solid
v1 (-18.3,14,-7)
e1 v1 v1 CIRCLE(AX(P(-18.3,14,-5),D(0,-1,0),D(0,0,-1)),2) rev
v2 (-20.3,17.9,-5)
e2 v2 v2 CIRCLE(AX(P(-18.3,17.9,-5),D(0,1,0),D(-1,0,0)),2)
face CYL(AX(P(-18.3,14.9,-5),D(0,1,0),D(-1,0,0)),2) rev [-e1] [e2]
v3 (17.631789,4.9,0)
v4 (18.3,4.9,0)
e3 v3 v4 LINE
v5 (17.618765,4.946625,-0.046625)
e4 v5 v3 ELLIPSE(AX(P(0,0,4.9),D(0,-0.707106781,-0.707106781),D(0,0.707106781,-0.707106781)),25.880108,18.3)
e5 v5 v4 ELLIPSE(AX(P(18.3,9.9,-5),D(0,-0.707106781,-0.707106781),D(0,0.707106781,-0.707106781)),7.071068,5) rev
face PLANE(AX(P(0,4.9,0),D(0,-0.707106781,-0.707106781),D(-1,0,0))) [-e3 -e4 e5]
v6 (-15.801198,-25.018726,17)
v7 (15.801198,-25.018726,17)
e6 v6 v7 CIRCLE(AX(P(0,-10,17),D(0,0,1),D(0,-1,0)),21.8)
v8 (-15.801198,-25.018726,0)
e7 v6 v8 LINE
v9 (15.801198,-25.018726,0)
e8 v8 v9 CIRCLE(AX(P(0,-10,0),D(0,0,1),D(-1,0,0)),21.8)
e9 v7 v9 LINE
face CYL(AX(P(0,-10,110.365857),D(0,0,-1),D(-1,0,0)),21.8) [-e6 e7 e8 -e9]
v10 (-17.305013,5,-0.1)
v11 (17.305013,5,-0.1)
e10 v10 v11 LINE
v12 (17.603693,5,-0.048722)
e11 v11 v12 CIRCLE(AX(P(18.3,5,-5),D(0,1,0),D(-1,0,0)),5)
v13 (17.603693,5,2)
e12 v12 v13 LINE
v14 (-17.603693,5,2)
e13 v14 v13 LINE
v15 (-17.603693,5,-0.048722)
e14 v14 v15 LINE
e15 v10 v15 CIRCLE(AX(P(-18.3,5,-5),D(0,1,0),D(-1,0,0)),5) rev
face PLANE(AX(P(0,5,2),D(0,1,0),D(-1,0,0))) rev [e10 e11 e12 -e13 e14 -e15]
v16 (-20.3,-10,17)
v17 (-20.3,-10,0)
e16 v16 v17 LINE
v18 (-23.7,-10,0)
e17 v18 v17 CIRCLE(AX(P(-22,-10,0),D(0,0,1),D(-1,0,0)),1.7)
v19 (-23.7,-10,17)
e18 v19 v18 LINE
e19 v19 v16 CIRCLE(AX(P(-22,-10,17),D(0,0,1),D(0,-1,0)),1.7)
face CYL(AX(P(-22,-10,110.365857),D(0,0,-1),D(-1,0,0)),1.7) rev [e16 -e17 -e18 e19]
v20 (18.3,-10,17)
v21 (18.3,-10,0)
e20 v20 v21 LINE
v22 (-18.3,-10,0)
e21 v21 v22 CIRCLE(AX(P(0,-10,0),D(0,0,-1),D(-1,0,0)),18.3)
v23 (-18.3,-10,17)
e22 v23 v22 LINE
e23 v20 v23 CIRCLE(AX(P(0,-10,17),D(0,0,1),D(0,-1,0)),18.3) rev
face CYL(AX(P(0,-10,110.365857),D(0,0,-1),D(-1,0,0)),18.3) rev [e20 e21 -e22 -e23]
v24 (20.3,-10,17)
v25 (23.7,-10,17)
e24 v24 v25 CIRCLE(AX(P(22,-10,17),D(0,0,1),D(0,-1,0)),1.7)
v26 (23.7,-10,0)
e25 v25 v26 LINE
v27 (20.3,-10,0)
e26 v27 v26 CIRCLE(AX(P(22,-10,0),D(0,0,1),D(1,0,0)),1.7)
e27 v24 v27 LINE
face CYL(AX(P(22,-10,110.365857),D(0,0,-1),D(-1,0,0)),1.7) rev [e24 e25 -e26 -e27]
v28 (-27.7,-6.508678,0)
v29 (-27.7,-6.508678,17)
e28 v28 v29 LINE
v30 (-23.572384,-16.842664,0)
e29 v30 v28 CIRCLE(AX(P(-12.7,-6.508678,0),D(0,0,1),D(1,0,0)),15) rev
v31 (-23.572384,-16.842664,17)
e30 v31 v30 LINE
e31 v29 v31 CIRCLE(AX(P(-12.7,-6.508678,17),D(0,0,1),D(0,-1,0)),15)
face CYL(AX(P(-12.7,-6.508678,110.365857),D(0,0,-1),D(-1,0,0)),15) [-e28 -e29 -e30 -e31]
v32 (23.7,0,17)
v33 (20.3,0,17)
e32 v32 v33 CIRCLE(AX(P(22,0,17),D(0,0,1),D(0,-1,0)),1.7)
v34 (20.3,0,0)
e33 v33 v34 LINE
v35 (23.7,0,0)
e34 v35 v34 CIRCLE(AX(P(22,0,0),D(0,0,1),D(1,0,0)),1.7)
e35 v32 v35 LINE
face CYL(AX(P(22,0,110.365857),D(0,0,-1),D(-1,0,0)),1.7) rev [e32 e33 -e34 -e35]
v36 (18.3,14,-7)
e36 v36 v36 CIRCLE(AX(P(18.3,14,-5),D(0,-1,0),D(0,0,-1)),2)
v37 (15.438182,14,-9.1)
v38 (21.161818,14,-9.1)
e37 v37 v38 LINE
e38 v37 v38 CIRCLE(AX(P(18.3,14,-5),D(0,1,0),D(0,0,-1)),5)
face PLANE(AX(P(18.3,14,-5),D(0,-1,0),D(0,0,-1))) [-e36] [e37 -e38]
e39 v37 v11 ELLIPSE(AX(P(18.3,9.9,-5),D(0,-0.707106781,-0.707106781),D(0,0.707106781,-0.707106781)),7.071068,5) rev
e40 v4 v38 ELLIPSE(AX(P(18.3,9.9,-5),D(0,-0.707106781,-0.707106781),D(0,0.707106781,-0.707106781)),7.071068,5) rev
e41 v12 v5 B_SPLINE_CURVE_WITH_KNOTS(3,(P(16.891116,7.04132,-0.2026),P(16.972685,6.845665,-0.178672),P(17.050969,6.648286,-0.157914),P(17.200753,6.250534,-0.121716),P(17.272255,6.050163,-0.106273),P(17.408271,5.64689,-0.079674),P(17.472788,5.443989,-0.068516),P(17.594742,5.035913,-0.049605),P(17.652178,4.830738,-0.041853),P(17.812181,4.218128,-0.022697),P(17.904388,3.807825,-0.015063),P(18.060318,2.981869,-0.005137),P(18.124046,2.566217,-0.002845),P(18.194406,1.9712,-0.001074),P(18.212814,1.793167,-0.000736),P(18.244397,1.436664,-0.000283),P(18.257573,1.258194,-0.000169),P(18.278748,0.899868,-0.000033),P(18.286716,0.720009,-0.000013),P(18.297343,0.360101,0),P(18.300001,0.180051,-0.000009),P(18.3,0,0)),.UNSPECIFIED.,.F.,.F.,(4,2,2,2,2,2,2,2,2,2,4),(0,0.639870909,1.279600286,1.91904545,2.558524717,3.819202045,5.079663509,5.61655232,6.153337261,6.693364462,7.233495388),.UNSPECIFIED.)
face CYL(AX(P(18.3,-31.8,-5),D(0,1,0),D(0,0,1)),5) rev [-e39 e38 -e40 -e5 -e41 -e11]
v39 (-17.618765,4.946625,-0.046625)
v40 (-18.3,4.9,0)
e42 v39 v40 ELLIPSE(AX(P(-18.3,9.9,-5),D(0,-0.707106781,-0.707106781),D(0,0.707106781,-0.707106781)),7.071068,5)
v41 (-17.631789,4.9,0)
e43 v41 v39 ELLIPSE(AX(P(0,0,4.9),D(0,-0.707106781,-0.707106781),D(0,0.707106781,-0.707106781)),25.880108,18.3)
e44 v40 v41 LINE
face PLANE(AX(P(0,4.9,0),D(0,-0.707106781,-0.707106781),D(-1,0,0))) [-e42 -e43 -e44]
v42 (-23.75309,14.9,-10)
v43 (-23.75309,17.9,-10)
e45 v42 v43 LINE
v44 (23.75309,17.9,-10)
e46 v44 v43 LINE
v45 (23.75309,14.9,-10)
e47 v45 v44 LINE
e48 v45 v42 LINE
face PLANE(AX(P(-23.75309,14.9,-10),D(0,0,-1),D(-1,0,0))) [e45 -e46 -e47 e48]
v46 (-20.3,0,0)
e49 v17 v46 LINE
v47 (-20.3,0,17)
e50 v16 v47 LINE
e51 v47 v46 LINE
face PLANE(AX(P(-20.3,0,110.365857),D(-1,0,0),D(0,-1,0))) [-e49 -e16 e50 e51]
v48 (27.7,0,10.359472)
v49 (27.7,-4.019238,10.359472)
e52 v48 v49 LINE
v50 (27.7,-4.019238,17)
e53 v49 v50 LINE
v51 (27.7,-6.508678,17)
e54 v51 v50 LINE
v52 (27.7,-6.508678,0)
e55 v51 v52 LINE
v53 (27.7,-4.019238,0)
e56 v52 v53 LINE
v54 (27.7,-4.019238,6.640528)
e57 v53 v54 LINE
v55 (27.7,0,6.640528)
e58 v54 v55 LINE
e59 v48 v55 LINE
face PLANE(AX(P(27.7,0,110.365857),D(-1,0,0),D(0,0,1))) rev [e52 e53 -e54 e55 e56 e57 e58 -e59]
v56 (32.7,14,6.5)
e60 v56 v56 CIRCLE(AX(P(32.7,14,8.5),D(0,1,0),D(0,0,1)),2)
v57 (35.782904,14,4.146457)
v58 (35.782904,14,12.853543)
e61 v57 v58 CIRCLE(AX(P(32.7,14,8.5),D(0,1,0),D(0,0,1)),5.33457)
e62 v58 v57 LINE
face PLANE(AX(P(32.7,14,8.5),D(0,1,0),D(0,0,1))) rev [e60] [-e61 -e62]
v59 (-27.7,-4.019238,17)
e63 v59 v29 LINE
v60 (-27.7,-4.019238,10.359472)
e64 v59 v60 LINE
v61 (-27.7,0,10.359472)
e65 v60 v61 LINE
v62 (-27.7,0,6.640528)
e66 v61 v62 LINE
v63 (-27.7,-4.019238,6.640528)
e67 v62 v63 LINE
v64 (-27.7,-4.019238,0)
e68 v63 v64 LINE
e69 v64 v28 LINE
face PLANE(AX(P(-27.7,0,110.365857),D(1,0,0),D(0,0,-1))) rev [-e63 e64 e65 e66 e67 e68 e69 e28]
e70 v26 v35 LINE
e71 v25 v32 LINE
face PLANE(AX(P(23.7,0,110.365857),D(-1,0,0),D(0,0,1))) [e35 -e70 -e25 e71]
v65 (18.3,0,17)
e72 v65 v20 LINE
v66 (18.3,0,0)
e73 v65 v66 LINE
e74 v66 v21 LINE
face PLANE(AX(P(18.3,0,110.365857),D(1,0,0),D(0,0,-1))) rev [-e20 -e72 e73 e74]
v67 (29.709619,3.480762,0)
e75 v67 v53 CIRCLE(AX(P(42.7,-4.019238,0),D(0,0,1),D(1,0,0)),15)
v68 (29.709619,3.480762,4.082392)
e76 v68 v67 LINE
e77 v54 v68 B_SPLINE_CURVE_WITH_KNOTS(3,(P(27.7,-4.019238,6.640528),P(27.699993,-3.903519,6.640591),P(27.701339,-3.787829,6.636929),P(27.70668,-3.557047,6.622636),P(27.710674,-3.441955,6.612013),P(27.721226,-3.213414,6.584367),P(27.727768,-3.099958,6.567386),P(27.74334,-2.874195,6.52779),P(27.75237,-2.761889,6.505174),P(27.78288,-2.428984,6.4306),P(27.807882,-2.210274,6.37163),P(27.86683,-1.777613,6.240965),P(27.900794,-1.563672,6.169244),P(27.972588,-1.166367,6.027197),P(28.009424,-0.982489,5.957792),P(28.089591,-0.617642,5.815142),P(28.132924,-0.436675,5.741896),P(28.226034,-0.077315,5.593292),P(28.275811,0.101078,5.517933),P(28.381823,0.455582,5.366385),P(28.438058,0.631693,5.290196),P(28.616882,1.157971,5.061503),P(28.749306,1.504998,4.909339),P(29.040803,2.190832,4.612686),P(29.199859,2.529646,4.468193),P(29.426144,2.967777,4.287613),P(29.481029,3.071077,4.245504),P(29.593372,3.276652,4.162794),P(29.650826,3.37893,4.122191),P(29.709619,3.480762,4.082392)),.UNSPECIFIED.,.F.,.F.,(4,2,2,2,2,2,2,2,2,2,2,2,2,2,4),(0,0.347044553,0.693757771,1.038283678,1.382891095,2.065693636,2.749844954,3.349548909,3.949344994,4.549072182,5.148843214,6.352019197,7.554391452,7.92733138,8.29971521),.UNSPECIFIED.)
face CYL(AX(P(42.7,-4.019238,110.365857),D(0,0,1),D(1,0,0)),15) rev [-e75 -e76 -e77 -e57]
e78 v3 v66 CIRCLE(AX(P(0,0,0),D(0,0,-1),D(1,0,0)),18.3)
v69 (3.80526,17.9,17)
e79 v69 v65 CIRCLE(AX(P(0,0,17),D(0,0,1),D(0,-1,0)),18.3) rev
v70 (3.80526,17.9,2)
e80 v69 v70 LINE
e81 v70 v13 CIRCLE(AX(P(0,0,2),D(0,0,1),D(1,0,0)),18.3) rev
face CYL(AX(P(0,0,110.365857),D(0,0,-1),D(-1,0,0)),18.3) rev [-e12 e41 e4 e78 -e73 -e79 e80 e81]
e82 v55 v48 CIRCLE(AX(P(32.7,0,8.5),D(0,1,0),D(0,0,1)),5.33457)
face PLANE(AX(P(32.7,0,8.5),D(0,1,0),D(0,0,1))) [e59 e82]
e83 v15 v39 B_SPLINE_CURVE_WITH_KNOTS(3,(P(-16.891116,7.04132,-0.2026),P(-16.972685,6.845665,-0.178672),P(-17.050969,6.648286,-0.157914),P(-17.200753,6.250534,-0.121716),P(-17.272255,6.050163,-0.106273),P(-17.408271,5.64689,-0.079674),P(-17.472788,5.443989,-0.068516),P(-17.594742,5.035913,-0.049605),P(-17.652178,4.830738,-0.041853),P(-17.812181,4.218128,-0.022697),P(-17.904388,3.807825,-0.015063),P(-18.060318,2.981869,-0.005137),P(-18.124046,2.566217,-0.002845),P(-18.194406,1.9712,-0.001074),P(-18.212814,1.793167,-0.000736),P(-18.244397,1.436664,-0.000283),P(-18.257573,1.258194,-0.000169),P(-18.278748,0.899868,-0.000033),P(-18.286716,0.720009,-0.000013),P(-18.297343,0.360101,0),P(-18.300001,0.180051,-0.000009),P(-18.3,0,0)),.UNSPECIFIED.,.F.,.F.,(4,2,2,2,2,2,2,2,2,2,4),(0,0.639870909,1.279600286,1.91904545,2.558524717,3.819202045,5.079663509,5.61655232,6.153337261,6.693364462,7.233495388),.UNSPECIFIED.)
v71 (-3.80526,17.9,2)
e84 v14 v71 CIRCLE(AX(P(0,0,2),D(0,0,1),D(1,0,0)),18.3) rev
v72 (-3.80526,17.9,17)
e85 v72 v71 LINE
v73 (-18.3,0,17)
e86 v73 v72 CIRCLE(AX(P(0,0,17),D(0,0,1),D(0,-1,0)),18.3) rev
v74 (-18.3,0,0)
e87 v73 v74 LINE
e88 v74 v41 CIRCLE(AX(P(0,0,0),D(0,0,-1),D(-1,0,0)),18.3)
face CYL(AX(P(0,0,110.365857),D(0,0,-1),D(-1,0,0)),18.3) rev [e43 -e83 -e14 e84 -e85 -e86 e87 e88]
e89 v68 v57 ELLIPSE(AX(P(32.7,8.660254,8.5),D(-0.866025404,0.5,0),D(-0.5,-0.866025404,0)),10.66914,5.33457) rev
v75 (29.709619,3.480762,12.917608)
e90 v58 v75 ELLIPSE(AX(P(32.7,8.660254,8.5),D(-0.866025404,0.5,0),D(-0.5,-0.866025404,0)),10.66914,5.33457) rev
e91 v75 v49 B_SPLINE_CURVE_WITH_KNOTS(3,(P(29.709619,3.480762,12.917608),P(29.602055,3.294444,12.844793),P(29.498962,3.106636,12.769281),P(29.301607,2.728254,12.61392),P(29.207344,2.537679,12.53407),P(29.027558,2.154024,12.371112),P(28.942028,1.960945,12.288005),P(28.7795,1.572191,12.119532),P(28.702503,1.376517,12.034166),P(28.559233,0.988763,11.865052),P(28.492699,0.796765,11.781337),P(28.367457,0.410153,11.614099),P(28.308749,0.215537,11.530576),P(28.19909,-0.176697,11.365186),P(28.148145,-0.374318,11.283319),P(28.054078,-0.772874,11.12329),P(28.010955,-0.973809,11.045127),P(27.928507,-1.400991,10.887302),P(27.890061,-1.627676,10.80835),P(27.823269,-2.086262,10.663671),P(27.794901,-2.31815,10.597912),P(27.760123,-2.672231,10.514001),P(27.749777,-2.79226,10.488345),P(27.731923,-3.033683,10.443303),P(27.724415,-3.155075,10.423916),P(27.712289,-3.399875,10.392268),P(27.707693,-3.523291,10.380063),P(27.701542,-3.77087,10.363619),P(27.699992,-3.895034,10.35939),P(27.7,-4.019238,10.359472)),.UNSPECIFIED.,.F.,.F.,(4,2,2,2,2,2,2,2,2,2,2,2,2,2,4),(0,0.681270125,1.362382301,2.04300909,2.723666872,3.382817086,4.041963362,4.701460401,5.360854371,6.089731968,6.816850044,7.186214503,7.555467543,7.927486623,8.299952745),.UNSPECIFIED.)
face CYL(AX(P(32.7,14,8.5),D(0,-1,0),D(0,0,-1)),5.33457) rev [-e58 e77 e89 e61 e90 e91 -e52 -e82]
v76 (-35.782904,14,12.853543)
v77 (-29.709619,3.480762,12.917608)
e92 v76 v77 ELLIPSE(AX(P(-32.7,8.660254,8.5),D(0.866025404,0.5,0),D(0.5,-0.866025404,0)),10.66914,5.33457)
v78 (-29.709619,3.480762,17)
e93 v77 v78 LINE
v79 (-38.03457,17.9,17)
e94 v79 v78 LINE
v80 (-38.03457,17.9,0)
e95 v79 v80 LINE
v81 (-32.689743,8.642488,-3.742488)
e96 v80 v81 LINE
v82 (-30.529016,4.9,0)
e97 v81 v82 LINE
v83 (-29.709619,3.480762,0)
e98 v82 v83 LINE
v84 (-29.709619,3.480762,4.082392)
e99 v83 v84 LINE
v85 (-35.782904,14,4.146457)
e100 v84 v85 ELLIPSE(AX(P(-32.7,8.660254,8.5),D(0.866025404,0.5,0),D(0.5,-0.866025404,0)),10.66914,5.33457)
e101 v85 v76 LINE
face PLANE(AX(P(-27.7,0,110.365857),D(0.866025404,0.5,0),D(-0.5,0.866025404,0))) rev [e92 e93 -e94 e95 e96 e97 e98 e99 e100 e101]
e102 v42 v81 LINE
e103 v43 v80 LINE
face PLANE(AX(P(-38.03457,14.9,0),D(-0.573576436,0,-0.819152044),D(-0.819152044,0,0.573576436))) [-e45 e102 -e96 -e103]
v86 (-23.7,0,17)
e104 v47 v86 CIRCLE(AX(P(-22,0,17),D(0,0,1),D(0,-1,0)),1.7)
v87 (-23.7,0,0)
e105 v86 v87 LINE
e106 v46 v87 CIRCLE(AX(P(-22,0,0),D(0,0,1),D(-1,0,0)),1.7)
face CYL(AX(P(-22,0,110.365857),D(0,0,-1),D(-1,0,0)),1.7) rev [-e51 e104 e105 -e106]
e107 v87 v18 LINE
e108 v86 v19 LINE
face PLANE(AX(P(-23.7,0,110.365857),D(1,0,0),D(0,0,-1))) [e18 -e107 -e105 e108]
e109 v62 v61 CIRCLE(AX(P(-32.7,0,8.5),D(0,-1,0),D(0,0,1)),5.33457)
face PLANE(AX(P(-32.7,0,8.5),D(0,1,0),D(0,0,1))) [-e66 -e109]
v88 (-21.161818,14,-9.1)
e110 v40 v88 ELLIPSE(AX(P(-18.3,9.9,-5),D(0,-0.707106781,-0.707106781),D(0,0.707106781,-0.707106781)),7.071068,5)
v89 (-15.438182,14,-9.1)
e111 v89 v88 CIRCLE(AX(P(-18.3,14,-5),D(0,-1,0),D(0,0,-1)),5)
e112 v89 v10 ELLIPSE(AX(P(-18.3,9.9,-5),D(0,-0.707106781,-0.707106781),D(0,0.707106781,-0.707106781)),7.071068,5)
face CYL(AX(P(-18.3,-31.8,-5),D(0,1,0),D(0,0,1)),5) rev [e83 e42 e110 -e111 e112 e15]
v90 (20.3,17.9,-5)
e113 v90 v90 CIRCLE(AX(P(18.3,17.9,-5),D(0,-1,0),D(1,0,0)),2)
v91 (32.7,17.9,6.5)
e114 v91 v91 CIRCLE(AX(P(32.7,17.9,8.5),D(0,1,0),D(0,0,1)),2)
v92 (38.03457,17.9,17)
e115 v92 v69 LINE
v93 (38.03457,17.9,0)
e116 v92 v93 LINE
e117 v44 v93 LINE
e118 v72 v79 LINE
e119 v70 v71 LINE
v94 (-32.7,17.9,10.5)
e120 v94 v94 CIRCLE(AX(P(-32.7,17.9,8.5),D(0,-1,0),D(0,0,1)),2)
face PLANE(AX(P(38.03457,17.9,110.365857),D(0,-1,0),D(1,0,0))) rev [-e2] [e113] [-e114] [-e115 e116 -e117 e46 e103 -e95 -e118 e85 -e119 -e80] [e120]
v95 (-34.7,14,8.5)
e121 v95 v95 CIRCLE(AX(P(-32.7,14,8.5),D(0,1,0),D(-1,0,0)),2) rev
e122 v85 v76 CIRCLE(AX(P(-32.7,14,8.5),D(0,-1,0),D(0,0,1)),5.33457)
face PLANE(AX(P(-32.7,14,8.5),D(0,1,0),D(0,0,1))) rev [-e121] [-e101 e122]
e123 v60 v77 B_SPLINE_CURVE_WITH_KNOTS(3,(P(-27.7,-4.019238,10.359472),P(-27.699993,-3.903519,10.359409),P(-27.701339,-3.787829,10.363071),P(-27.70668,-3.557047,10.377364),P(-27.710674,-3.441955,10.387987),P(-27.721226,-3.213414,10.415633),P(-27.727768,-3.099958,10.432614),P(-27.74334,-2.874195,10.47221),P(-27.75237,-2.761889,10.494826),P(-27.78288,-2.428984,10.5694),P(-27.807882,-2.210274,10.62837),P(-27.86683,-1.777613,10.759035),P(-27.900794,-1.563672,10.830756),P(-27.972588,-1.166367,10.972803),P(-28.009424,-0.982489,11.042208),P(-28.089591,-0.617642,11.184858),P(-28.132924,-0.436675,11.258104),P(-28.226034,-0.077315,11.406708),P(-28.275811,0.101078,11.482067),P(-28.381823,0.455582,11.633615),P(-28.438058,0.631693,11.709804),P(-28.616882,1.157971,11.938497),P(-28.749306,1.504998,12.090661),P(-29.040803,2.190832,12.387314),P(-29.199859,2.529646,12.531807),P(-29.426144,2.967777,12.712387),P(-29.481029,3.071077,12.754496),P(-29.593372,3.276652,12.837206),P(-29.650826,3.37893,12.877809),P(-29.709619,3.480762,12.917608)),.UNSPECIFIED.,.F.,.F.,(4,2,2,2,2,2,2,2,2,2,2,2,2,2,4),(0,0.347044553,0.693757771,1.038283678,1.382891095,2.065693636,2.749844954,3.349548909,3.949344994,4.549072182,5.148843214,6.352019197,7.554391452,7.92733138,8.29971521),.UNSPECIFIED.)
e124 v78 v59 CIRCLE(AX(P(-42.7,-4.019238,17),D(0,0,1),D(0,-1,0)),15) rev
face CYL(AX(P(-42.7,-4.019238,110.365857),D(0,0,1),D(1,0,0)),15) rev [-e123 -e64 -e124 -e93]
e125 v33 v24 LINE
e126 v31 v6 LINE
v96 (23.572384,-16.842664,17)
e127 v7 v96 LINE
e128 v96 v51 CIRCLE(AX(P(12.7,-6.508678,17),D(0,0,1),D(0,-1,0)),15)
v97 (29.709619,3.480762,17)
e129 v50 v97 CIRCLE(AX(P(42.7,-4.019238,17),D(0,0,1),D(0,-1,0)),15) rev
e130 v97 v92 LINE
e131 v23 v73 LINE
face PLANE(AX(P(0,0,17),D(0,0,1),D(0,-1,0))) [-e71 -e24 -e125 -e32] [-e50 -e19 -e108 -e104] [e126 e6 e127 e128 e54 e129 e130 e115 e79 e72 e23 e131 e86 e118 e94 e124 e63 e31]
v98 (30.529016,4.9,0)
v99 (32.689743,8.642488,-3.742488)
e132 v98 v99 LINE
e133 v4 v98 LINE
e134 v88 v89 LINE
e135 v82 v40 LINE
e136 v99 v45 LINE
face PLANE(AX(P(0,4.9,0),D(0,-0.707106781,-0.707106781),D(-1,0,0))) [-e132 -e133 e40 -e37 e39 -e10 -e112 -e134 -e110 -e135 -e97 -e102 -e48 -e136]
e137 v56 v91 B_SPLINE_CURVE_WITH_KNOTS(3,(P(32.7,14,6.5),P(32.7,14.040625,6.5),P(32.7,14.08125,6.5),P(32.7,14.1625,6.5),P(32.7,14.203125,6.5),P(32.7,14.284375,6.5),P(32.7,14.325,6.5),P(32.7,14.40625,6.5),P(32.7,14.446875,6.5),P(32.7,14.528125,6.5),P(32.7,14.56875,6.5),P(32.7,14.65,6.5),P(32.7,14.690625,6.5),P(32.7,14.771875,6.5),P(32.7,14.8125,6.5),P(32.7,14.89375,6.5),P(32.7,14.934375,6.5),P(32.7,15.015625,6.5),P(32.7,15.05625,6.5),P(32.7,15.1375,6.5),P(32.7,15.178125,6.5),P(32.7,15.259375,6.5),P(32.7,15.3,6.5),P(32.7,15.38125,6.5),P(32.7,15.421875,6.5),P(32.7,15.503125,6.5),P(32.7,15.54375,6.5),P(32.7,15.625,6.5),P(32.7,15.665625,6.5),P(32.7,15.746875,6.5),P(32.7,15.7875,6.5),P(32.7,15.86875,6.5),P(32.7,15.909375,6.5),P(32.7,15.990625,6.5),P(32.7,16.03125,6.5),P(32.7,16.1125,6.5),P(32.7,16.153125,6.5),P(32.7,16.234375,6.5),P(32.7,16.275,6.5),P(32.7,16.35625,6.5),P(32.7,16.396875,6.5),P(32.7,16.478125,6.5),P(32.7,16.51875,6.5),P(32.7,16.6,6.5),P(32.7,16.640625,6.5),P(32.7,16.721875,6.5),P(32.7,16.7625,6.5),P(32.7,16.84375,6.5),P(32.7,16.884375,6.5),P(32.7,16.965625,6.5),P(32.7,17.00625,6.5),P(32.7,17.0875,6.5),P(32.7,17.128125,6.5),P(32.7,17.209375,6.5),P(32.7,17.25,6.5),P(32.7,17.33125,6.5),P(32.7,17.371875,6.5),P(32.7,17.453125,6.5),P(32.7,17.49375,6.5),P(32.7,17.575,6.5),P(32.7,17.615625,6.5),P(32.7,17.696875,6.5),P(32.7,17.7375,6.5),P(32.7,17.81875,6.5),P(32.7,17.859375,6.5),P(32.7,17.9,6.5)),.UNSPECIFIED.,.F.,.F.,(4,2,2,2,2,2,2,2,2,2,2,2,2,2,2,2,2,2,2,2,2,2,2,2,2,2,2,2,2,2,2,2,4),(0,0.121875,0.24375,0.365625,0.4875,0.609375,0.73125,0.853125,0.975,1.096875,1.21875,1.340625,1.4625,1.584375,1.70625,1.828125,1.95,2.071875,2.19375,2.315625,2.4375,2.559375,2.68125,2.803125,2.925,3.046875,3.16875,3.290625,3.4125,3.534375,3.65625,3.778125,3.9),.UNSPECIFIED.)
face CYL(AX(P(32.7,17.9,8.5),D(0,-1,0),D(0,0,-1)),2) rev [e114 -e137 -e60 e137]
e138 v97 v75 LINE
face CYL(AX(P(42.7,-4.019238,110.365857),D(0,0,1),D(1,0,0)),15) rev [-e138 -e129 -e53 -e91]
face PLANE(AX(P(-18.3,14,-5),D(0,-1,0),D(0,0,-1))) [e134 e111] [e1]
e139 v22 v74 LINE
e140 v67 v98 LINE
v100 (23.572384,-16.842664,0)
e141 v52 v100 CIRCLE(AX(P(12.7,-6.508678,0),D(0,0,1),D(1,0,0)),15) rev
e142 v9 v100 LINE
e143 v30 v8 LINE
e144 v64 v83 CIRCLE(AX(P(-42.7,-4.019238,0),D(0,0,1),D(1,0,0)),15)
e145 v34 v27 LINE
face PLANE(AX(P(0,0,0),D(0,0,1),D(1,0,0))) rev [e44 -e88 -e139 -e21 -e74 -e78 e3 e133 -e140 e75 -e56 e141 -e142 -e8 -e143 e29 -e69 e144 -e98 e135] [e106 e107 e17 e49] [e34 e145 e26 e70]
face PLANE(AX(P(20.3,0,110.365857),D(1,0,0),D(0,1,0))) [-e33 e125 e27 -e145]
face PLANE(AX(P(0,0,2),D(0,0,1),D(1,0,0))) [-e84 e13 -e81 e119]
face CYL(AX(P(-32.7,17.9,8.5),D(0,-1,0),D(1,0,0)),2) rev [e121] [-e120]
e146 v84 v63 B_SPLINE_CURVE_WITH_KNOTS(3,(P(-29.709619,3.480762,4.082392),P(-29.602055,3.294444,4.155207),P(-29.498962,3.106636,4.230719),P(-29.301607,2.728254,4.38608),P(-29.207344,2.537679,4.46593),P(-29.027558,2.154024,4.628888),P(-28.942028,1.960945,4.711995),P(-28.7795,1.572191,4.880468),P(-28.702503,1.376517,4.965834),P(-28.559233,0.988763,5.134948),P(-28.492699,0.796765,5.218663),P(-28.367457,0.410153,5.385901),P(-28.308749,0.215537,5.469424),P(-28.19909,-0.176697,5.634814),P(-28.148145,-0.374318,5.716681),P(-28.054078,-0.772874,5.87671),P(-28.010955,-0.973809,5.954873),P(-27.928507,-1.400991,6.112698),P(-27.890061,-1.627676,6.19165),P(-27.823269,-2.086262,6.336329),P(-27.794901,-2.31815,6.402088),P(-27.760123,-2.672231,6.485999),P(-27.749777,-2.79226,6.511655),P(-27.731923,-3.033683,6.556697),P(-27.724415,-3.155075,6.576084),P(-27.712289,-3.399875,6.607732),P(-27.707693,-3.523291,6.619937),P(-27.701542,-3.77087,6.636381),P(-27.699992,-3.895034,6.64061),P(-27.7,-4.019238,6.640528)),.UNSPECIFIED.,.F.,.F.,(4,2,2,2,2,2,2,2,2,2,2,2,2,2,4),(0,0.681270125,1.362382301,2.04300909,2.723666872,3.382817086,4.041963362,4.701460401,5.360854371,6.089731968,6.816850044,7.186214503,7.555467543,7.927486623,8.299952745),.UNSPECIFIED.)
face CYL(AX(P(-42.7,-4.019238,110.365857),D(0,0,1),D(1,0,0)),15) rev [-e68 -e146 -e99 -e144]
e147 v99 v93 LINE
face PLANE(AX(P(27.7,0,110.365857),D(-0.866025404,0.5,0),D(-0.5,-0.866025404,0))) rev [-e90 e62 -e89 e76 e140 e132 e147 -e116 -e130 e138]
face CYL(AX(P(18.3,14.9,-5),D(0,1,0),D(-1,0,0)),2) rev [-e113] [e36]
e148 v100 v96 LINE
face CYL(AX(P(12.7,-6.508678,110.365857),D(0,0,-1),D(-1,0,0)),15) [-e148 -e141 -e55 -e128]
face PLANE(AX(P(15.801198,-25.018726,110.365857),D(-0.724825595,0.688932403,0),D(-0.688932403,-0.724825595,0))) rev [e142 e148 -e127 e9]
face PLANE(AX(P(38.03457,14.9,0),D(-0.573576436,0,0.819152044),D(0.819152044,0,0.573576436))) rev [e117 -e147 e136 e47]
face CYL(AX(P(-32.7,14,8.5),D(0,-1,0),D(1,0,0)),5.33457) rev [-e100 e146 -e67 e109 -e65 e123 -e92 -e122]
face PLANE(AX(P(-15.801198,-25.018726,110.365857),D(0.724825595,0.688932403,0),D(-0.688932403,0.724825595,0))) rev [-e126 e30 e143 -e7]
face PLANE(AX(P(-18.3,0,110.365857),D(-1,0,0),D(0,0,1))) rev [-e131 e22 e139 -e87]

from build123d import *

# Parameters (mm, degrees)
BOSS_EXTRUDE1_DEPTH = 17
BOSS_EXTRUDE2_START = -17
BOSS_EXTRUDE2_DEPTH = 2
SKETCH3_R           = 2
CUT_EXTRUDE2_DEPTH  = 53.410576235
SKETCH4_R           = 5.334569818
CUT_EXTRUDE3_DEPTH  = 14
SKETCH5_R           = 2
BOSS_EXTRUDE3_DEPTH = 3
CUT_EXTRUDE4_DEPTH  = 57.452356029
CHAMFER2_SIZE       = 10
FILLET1_R           = 15
FILLET2_R           = 15
SKETCH7_R           = 5
CUT_EXTRUDE6_DEPTH  = 62.913395196


with BuildPart() as part:
    # Sketch1 → Boss-Extrude1 (new body)
    with BuildSketch(Plane.XY):
        with BuildLine():
            Line((38.034569818, 17.9), (3.805259518, 17.9))
            ThreePointArc((3.805259518, 17.9), (14.221924082, 11.51637423), (18.3, 0))
            Line((18.3, 0), (18.3, -10))
            ThreePointArc((18.3, -10), (0, -28.3), (-18.3, -10))
            Line((-18.3, -10), (-18.3, 0))
            ThreePointArc((-18.3, 0), (-14.221924082, 11.51637423), (-3.805259518, 17.9))
            Line((-3.805259518, 17.9), (-38.034569818, 17.9))
            Line((-38.034569818, 17.9), (-27.7, 0))
            Line((-27.7, 0), (-27.7, -12.5))
            Line((-27.7, -12.5), (-15.801197979, -25.018726392))
            ThreePointArc((-15.801197979, -25.018726392), (0, -31.8), (15.801197979, -25.018726392))
            Line((15.801197979, -25.018726392), (27.7, -12.5))
            Line((27.7, -12.5), (27.7, 0))
            Line((27.7, 0), (38.034569818, 17.9))
        make_face()
        with BuildLine():
            Line((23.7, 0), (23.7, -10))
            ThreePointArc((23.7, -10), (22, -11.7), (20.3, -10))
            Line((20.3, -10), (20.3, 0))
            ThreePointArc((20.3, 0), (22, 1.7), (23.7, 0))
        make_face(mode=Mode.SUBTRACT)
        with BuildLine():
            Line((-23.7, 0), (-23.7, -10))
            ThreePointArc((-23.7, -10), (-22, -11.7), (-20.3, -10))
            Line((-20.3, -10), (-20.3, 0))
            ThreePointArc((-20.3, 0), (-22, 1.7), (-23.7, 0))
        make_face(mode=Mode.SUBTRACT)
    extrude(amount=BOSS_EXTRUDE1_DEPTH)

    # Sketch2 → Boss-Extrude2 (add)
    with BuildSketch(Plane.XY.offset(17).offset(BOSS_EXTRUDE2_START)):
        Polygon((38.034569818, 17.9), (-38.034569818, 17.9), (-30.586751346, 5), (30.586751346, 5), align=None)
    extrude(amount=BOSS_EXTRUDE2_DEPTH)

    # Sketch3 → Cut-Extrude2 (cut, through all)
    with BuildSketch(Plane(origin=(0, 0, 0), x_dir=(1, 0, 0), z_dir=(0, 1, 0))):
        with Locations(Location((32.7, -8.5, 0), (0, 0, 180))):
            Circle(SKETCH3_R)
    cut_extrude2 = extrude(amount=CUT_EXTRUDE2_DEPTH, mode=Mode.SUBTRACT)

    # Sketch4 → Cut-Extrude3 (cut)
    with BuildSketch(Plane(origin=(0, 0, 0), x_dir=(1, 0, 0), z_dir=(0, 1, 0))):
        with Locations((32.7, -8.5)):
            Circle(SKETCH4_R)
    cut_extrude3 = extrude(amount=CUT_EXTRUDE3_DEPTH, mode=Mode.SUBTRACT)

    # Sketch5 → Boss-Extrude3 (add)
    with BuildSketch(Plane(origin=(0, 17.9, 0), x_dir=(1, 0, 0), z_dir=(0, 1, 0))):
        Polygon((-38.034569818, 0), (-23.753089751, 10), (0, 10), (0, 0), align=None)
        with Locations(Location((-18.3, 5, 0), (0, 0, 180))):
            Circle(SKETCH5_R, mode=Mode.SUBTRACT)
    boss_extrude3 = extrude(amount=-BOSS_EXTRUDE3_DEPTH)

    # Sketch6 → Cut-Extrude4 (cut, through all)
    with BuildSketch(Plane(origin=(0, 0, -10), x_dir=(-1, 0, 0), z_dir=(0, 0, -1))):
        Polygon((36.302519011, 14.9), (38.034569818, 17.9), (38.034569818, 14.9), align=None)
    cut_extrude4 = extrude(amount=-CUT_EXTRUDE4_DEPTH, mode=Mode.SUBTRACT)

    # Mirror2: Cut-Extrude2, Cut-Extrude3, Boss-Extrude3 across plane
    add(cut_extrude2.mirror(Plane(origin=(0, 14.9, -10), x_dir=(0, 0, 1), z_dir=(1, 0, 0))), mode=Mode.SUBTRACT)
    add(cut_extrude3.mirror(Plane(origin=(0, 14.9, -10), x_dir=(0, 0, 1), z_dir=(1, 0, 0))), mode=Mode.SUBTRACT)
    add(boss_extrude3.mirror(Plane(origin=(0, 14.9, -10), x_dir=(0, 0, 1), z_dir=(1, 0, 0))))

    # Mirror3: Cut-Extrude2, Cut-Extrude3, Cut-Extrude4 across plane
    add(cut_extrude2.mirror(Plane(origin=(0, 0, 0), x_dir=(0, 0, 1), z_dir=(1, 0, 0))), mode=Mode.SUBTRACT)
    add(cut_extrude3.mirror(Plane(origin=(0, 0, 0), x_dir=(0, 0, 1), z_dir=(1, 0, 0))), mode=Mode.SUBTRACT)
    add(cut_extrude4.mirror(Plane(origin=(0, 0, 0), x_dir=(0, 0, 1), z_dir=(1, 0, 0))), mode=Mode.SUBTRACT)

    # Chamfer2
    # the kernel refuses this chamfer: 10 mm, written as the material it adds along each edge
    with BuildSketch(Plane(origin=(-62.019348891, 14.9, 0), x_dir=(0, 0.027495876610586317, -0.9996219169112968), z_dir=(1, 0, 0))) as chamfer2_piece_1_section:
        Polygon((CHAMFER2_SIZE * 0.999621916911, -CHAMFER2_SIZE * 0.0274958766106), (-CHAMFER2_SIZE * 0.0274958766106, -CHAMFER2_SIZE * 0.999621916911), (0, 0), align=None)
    chamfer2_piece_1 = extrude(amount=124.038697781, mode=Mode.PRIVATE)
    chamfer2_piece_1 = chamfer2_piece_1 - Plane(origin=(18.3, 11.716008288, -5), x_dir=(1, 0, 0), z_dir=(0, 1, 0)) * Cylinder(2, 289, mode=Mode.PRIVATE)
    chamfer2_piece_1 = chamfer2_piece_1 - Plane(origin=(-18.3, 11.716008288, -5), x_dir=(-1, 0, 0), z_dir=(0, 1, 0)) * Cylinder(2, 289, mode=Mode.PRIVATE)
    chamfer2_piece_1 = split(chamfer2_piece_1, bisect_by=Plane(origin=(-4.622195202, 11.716008288, -29.868588423), z_dir=(-0.5735764363510418, 0, 0.819152044288995)), keep=Keep.TOP, mode=Mode.PRIVATE)
    chamfer2_piece_1 = split(chamfer2_piece_1, bisect_by=Plane(origin=(-26.779856727, 11.716008288, -7.880634947), z_dir=(0.5735764363510418, 0, 0.819152044288995)), keep=Keep.TOP, mode=Mode.PRIVATE)
    chamfer2_piece_1 = split(chamfer2_piece_1, bisect_by=Plane(origin=(-31.697953242, 6.924658142, -3.052401614), z_dir=(0.8660254037844364, 0.500000000000004, 0)), keep=Keep.TOP, mode=Mode.PRIVATE)
    chamfer2_piece_1 = chamfer2_piece_1 - Plane(origin=(0, 0, -3.052401614), x_dir=(-1, 0, 0), z_dir=(0, 0, -1)) * Cylinder(18.3, 289, mode=Mode.PRIVATE)
    chamfer2_piece_1 = split(chamfer2_piece_1, bisect_by=Plane(origin=(19.998407566, -13.339549394, -3.052401614), z_dir=(-0.8660254037844365, 0.5000000000000038, 0)), keep=Keep.TOP, mode=Mode.PRIVATE)
    add(chamfer2_piece_1)
    with BuildSketch(Plane(origin=(-62.019348891, 14.9, 0), x_dir=(0, 0.027495876610586317, -0.9996219169112968), z_dir=(1, 0, 0))) as chamfer2_piece_2_section:
        Polygon((CHAMFER2_SIZE * 0.999621916911, -CHAMFER2_SIZE * 0.0274958766106), (-CHAMFER2_SIZE * 0.0274958766106, -CHAMFER2_SIZE * 0.999621916911), (0, 0), align=None)
    chamfer2_piece_2 = extrude(amount=124.038697781, mode=Mode.PRIVATE)
    chamfer2_piece_2 = split(chamfer2_piece_2, bisect_by=Plane(origin=(0, 5, -3.178355845), z_dir=(0, 1, 0)), keep=Keep.TOP, mode=Mode.PRIVATE)
    chamfer2_piece_2 = chamfer2_piece_2 & Plane(origin=(0, 0, -3.178355845), x_dir=(-1, 0, 0), z_dir=(0, 0, -1)) * Cylinder(18.3, 289, mode=Mode.PRIVATE)
    add(chamfer2_piece_2)

    # Fillet1
    fillet1_edges = [part.edges().sort_by_distance(p)[0] for p in [
        (27.7, -12.5, 8.5),
        (-27.7, -12.5, 8.5),
    ]]
    fillet(fillet1_edges, radius=FILLET1_R)

    # Fillet2
    fillet2_edges = [part.edges().sort_by_distance(p)[0] for p in [
        (27.7, 0, 13.67973587),
        (27.7, 0, 3.32026413),
        (-27.7, 0, 13.67973587),
        (-27.7, 0, 3.32026413),
    ]]
    fillet(fillet2_edges, radius=FILLET2_R)

    # Sketch7 → Cut-Extrude6 (cut, through all)
    with BuildSketch(Plane.XZ.offset(-14)):
        with Locations((-18.3, -5)):
            Circle(SKETCH7_R)
    cut_extrude6 = extrude(amount=CUT_EXTRUDE6_DEPTH, mode=Mode.SUBTRACT)

    # Mirror4: Cut-Extrude6 across plane
    add(cut_extrude6.mirror(Plane(origin=(0, 0, 0), x_dir=(0, 0, 1), z_dir=(1, 0, 0))), mode=Mode.SUBTRACT)


solid = part.part
